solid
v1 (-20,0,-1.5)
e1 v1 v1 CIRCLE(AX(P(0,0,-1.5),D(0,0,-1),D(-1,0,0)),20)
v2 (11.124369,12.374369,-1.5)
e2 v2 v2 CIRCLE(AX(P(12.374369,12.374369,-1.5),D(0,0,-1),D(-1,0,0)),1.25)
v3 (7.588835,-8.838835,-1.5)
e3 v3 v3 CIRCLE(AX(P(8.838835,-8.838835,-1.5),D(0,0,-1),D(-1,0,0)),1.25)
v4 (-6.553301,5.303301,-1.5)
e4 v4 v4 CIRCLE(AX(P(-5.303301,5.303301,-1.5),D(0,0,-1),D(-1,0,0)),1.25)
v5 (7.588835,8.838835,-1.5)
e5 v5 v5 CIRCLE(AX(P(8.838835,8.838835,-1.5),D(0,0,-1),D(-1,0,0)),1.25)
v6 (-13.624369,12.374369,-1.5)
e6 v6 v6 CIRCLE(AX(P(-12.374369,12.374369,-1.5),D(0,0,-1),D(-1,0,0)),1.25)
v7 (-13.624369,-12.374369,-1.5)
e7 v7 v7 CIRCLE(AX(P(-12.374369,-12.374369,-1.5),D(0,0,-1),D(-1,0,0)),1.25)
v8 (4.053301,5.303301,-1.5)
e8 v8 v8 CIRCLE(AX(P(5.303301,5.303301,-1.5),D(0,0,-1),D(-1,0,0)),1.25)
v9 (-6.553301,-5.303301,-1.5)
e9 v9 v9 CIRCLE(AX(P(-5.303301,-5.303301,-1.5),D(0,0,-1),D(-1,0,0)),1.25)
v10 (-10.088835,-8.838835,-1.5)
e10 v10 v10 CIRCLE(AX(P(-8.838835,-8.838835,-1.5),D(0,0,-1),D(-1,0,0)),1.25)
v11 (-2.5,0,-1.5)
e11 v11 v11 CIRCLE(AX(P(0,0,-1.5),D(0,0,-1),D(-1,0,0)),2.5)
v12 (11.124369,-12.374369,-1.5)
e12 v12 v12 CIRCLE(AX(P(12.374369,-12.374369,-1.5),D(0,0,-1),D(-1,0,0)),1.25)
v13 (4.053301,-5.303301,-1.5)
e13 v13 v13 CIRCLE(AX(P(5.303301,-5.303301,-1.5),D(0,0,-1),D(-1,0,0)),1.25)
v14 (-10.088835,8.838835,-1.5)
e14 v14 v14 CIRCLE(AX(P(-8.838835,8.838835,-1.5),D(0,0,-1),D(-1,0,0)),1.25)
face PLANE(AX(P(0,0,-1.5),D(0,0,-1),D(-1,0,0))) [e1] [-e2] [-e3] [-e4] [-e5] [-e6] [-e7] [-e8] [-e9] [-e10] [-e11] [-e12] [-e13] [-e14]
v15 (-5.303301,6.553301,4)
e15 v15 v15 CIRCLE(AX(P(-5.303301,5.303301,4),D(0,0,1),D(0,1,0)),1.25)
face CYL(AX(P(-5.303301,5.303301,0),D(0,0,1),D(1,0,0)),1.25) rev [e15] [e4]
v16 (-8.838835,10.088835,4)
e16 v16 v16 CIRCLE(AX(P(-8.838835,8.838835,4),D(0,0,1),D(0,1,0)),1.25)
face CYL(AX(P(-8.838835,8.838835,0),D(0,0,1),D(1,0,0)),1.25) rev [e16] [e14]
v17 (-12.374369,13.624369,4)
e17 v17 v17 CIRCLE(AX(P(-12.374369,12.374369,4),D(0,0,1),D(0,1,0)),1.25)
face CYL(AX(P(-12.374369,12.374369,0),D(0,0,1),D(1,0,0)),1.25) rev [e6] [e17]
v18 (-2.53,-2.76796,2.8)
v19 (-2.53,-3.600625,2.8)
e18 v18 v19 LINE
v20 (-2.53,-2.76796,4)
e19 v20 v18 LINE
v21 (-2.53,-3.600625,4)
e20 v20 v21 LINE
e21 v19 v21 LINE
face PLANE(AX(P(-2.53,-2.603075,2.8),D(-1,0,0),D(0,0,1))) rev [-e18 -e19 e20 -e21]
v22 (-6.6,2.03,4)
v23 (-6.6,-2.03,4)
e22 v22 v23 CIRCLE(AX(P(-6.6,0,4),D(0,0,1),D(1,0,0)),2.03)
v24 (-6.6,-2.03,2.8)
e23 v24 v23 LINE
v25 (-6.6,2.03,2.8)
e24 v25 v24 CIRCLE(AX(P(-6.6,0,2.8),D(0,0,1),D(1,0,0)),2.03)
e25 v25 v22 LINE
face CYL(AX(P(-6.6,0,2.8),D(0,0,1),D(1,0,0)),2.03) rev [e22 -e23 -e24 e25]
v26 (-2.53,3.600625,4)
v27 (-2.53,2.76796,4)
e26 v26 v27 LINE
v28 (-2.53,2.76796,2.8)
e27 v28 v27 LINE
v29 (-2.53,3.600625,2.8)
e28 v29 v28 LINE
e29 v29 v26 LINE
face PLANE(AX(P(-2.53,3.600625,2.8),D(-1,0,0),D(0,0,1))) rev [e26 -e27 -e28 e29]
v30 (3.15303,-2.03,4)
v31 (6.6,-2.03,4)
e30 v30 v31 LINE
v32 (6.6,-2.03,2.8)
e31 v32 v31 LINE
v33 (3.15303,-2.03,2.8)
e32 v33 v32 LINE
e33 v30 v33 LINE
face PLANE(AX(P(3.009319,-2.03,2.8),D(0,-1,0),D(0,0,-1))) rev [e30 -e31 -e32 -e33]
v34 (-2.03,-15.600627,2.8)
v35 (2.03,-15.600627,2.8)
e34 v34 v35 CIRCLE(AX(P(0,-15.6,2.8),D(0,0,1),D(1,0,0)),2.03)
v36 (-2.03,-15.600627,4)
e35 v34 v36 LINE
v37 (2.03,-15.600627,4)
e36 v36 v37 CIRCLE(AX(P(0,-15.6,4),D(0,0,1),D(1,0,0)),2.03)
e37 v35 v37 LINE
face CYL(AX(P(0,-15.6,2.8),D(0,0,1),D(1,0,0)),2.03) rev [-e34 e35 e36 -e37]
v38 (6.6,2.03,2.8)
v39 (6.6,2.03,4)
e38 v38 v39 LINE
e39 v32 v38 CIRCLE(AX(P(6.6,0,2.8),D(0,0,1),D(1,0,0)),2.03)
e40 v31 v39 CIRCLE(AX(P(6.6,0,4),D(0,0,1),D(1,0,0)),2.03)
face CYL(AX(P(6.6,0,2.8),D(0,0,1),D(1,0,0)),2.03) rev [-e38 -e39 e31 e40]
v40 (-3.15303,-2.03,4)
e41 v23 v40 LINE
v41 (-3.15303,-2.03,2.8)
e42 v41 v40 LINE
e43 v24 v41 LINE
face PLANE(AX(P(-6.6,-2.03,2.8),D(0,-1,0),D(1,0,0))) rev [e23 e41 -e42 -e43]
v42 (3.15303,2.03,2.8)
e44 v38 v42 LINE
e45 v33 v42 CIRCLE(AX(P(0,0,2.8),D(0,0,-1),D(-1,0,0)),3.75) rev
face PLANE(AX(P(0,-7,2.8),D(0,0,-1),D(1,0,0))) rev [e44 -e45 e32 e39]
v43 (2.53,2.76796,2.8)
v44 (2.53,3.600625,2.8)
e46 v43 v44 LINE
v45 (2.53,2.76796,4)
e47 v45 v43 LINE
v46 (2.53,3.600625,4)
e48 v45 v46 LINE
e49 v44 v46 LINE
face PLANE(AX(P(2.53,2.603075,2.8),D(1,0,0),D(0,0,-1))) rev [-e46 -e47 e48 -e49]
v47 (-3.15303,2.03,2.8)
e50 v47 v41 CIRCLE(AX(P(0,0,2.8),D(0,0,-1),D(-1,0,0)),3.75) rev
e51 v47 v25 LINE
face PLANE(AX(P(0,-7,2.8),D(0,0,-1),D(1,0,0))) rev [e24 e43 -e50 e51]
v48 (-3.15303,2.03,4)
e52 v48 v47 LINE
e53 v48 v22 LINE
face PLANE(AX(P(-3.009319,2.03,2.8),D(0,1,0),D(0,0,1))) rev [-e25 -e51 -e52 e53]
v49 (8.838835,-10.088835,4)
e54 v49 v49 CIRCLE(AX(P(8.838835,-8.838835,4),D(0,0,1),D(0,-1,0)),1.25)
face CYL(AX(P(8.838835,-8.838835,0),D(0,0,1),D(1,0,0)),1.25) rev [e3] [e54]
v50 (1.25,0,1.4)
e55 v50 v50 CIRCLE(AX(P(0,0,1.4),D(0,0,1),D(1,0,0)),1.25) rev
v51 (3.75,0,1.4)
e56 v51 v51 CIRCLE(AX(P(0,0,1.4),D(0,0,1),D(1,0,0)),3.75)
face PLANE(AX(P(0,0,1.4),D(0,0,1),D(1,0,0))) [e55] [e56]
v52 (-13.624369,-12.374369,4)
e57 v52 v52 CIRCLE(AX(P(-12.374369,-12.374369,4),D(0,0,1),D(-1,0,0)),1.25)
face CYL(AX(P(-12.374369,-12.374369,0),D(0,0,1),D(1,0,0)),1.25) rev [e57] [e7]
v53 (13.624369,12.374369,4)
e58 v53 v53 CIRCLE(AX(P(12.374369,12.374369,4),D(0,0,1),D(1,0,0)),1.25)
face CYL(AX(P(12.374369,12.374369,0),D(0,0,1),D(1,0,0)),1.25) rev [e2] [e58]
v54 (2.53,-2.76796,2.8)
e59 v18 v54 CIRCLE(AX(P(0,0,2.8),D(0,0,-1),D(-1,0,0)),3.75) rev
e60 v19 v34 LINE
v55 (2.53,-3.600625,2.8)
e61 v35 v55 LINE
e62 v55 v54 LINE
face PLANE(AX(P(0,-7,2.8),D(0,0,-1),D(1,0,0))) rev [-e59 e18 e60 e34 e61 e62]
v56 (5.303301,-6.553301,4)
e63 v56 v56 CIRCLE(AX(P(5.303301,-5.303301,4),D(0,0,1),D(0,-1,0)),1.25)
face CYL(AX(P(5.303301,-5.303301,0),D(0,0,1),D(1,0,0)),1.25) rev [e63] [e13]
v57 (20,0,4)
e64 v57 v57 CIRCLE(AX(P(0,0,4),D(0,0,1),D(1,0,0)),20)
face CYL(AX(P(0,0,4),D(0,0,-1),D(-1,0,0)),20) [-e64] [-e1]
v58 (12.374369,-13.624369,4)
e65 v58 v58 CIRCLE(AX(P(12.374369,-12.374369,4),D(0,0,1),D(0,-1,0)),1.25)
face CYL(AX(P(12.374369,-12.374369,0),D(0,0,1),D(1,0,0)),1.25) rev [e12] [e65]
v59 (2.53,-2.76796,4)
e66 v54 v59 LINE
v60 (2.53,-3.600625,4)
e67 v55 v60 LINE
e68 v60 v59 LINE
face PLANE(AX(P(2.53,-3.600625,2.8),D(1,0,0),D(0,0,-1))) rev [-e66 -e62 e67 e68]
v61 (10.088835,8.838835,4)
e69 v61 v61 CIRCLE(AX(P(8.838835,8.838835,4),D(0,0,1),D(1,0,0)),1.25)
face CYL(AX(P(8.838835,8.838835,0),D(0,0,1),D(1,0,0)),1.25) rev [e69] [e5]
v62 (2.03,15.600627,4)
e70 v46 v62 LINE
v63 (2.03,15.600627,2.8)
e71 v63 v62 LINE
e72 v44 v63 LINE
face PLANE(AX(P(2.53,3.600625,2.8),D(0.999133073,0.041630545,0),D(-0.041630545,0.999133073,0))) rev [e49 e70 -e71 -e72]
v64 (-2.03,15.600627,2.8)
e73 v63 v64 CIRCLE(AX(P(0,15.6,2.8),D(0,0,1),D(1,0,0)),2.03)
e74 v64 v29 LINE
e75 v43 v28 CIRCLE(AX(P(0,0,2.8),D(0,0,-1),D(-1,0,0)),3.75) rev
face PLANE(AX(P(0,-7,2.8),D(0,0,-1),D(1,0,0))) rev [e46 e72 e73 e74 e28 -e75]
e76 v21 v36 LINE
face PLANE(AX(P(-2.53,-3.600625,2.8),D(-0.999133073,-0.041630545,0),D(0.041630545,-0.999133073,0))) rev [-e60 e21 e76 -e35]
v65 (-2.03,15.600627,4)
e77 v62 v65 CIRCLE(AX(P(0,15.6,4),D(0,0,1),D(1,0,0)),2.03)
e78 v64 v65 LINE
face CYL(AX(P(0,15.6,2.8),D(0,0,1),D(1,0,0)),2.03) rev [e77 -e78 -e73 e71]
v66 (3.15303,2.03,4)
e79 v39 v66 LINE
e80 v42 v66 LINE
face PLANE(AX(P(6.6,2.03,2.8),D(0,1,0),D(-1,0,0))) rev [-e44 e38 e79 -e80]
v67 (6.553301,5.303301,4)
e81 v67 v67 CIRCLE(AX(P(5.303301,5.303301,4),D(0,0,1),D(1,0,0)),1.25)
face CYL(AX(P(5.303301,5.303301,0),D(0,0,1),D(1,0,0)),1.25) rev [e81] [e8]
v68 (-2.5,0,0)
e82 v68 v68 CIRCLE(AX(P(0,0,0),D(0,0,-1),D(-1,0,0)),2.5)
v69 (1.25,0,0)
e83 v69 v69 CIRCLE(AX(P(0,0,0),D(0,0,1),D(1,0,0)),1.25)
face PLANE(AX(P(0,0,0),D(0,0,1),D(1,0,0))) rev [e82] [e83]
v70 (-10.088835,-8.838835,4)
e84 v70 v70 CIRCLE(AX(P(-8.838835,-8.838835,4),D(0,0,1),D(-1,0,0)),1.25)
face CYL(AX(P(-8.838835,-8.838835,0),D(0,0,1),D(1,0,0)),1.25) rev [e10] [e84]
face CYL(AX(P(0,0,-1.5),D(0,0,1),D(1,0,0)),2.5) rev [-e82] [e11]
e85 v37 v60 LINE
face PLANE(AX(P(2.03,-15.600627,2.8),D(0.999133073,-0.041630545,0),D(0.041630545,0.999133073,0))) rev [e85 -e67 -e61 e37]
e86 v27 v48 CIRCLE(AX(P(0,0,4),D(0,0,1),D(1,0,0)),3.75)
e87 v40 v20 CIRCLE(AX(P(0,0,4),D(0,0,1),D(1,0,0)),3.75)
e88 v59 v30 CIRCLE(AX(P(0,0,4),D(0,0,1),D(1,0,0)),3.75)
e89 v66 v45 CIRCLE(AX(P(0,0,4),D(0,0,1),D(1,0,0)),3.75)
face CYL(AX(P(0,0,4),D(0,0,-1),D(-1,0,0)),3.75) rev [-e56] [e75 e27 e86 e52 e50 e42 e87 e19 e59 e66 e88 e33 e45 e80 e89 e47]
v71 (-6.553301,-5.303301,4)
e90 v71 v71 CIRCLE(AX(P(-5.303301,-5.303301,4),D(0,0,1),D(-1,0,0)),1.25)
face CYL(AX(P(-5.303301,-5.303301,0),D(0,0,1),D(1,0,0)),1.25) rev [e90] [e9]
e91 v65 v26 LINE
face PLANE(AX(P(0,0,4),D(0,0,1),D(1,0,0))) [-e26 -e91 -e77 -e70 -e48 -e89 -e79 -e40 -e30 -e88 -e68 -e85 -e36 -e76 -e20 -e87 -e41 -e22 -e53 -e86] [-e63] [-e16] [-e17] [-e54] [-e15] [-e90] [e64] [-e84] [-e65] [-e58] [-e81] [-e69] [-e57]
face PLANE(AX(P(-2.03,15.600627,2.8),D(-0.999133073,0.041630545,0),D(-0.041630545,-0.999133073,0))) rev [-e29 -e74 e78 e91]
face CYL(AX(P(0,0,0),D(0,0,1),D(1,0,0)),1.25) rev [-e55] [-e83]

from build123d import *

# Parameters (mm, degrees)
SKETCH1_R               = 20
BOSS_EXTRUDE1_DEPTH     = 4
SKETCH2_R               = 1.25
CUT_EXTRUDE1_DEPTH      = 29.565713714
CAVITY1_START           = 2.8
CAVITY1_OUTLINE_R       = 0.675
CAVITY1_OUTLINE_R_2     = 0.6
CAVITY1_OUTLINE_R_3     = 2.5
CAVITY1_DEPTH           = 1.2
CAVITY1_START_2         = 3.4
CAVITY1_2_OUTLINE_R     = 2.5
CAVITY1_2_OUTLINE_R_2   = 1.25
CAVITY1_2_DEPTH         = 0.6
CUT_EXTRUDE2_START      = -2
CUT_EXTRUDE2_DEPTH      = 2
CUT_EXTRUDE3_START      = -1.2
CUT_EXTRUDE3_DEPTH      = 1.2
CUT_EXTRUDE4_DEPTH      = 1.2
SKETCH6_R               = 1.25
CUT_EXTRUDE5_DEPTH      = 29.565713714
CIRPATTERN1_COUNT       = 4
CUT_EXTRUDE6_DEPTH      = 29.422526278
CUT_EXTRUDE6_DEPTH_BACK = 1.4
SKETCH7_R               = 3.75
SKETCH8_R               = 20
SKETCH8_R_2             = 2.5
SKETCH8_R_3             = 1.25
BOSS_EXTRUDE2_DEPTH     = 1.5


# Read off the part's stored shape, not the designer's step: Cavity1
with BuildPart() as part:
    # Sketch1 → Boss-Extrude1 (new body)
    with BuildSketch(Plane.XY):
        Circle(SKETCH1_R)
    extrude(amount=BOSS_EXTRUDE1_DEPTH)

    # Sketch2 → Cut-Extrude1 (cut, through all)
    with BuildSketch(Plane.XY.offset(4)):
        Circle(SKETCH2_R)
    extrude(amount=-CUT_EXTRUDE1_DEPTH, mode=Mode.SUBTRACT)

    # Cavity1 outline → Cavity1 (cut)
    with BuildSketch(Plane.XY.offset(CAVITY1_START)):
        with BuildLine():
            ThreePointArc((2.993325909, 2), (2.762479071, 2.308399745), (2.5, 2.590366769))
            Line((2.5, 2.590366769), (2.5, 3.6))
            Line((2.5, 3.6), (2, 15.6))
            ThreePointArc((2, 15.6), (0, 17.6), (-2, 15.6))
            Line((-2, 15.6), (-2.5, 3.6))
            Line((-2.5, 3.6), (-2.5, 2.590366769))
            ThreePointArc((-2.5, 2.590366769), (-2.762479071, 2.308399745), (-2.993325909, 2))
            Line((-2.993325909, 2), (-6.6, 2))
            ThreePointArc((-6.6, 2), (-8.6, 0), (-6.6, -2))
            Line((-6.6, -2), (-2.993325909, -2))
            ThreePointArc((-2.993325909, -2), (-2.762479071, -2.308399745), (-2.5, -2.590366769))
            Line((-2.5, -2.590366769), (-2.5, -3.6))
            Line((-2.5, -3.6), (-2, -15.6))
            ThreePointArc((-2, -15.6), (0, -17.6), (2, -15.6))
            Line((2, -15.6), (2.5, -3.6))
            Line((2.5, -3.6), (2.5, -2.590366769))
            ThreePointArc((2.5, -2.590366769), (2.762479071, -2.308399745), (2.993325909, -2))
            Line((2.993325909, -2), (6.6, -2))
            ThreePointArc((6.6, -2), (8.6, 0), (6.6, 2))
            Line((6.6, 2), (2.993325909, 2))
        make_face()
        with Locations((0, -15.6)):
            Circle(CAVITY1_OUTLINE_R, mode=Mode.SUBTRACT)
        with Locations((0, -13.4)):
            Circle(CAVITY1_OUTLINE_R, mode=Mode.SUBTRACT)
        with Locations((0, -11.2)):
            Circle(CAVITY1_OUTLINE_R, mode=Mode.SUBTRACT)
        with Locations((0, -9)):
            Circle(CAVITY1_OUTLINE_R, mode=Mode.SUBTRACT)
        with Locations((0, -6.8)):
            Circle(CAVITY1_OUTLINE_R, mode=Mode.SUBTRACT)
        with Locations((0, -4.6)):
            Circle(CAVITY1_OUTLINE_R, mode=Mode.SUBTRACT)
        with Locations((-6.6, 0)):
            Circle(CAVITY1_OUTLINE_R_2, mode=Mode.SUBTRACT)
        with Locations((-4.6, 0)):
            Circle(CAVITY1_OUTLINE_R_2, mode=Mode.SUBTRACT)
        Circle(CAVITY1_OUTLINE_R_3, mode=Mode.SUBTRACT)
        with Locations((0, 4.6)):
            Circle(CAVITY1_OUTLINE_R, mode=Mode.SUBTRACT)
        with Locations((0, 6.8)):
            Circle(CAVITY1_OUTLINE_R, mode=Mode.SUBTRACT)
        with Locations((4.6, 0)):
            Circle(CAVITY1_OUTLINE_R_2, mode=Mode.SUBTRACT)
        with Locations((6.6, 0)):
            Circle(CAVITY1_OUTLINE_R_2, mode=Mode.SUBTRACT)
        with Locations((0, 9)):
            Circle(CAVITY1_OUTLINE_R, mode=Mode.SUBTRACT)
        with Locations((0, 11.2)):
            Circle(CAVITY1_OUTLINE_R, mode=Mode.SUBTRACT)
        with Locations((0, 13.4)):
            Circle(CAVITY1_OUTLINE_R, mode=Mode.SUBTRACT)
        with Locations((0, 15.6)):
            Circle(CAVITY1_OUTLINE_R, mode=Mode.SUBTRACT)
    extrude(amount=CAVITY1_DEPTH, mode=Mode.SUBTRACT)

    # Cavity1 2 outline → Cavity1 2 (cut)
    with BuildSketch(Plane.XY.offset(CAVITY1_START_2)):
        Circle(CAVITY1_2_OUTLINE_R)
        Circle(CAVITY1_2_OUTLINE_R_2, mode=Mode.SUBTRACT)
    extrude(amount=CAVITY1_2_DEPTH, mode=Mode.SUBTRACT)

    # Sketch3 → Cut-Extrude2 (cut)
    with BuildSketch(Plane.XY.offset(3.4).offset(CUT_EXTRUDE2_START)):
        with BuildLine():
            ThreePointArc((-2.5, 0), (0, -2.5), (2.5, 0))
            ThreePointArc((2.5, 0), (0, 2.5), (-2.5, 0))
        make_face()
    extrude(amount=CUT_EXTRUDE2_DEPTH, mode=Mode.SUBTRACT)

    # Sketch4 → Cut-Extrude3 (cut)
    with BuildSketch(Plane.XY.offset(4).offset(CUT_EXTRUDE3_START)):
        with BuildLine():
            Line((-6.6, -2), (-2.993325909, -2))
            ThreePointArc((-2.993325909, -2), (-2.762479071, -2.308399745), (-2.5, -2.590366769))
            Line((-2.5, -2.590366769), (-2.5, -3.6))
            Line((-2.5, -3.6), (-2, -15.6))
            ThreePointArc((-2, -15.6), (0, -17.6), (2, -15.6))
            Line((2, -15.6), (2.5, -3.6))
            Line((2.5, -3.6), (2.5, -2.590366769))
            ThreePointArc((2.5, -2.590366769), (2.762479071, -2.308399745), (2.993325909, -2))
            Line((2.993325909, -2), (6.6, -2))
            ThreePointArc((6.6, -2), (8.6, 0), (6.6, 2))
            Line((6.6, 2), (2.993325909, 2))
            ThreePointArc((2.993325909, 2), (2.762479071, 2.308399745), (2.5, 2.590366769))
            Line((2.5, 2.590366769), (2.5, 3.6))
            Line((2.5, 3.6), (2, 15.6))
            ThreePointArc((2, 15.6), (0, 17.6), (-2, 15.6))
            Line((-2, 15.6), (-2.5, 3.6))
            Line((-2.5, 3.6), (-2.5, 2.590366769))
            ThreePointArc((-2.5, 2.590366769), (-2.762479071, 2.308399745), (-2.993325909, 2))
            Line((-2.993325909, 2), (-6.6, 2))
            ThreePointArc((-6.6, 2), (-8.6, 0), (-6.6, -2))
        make_face()
    extrude(amount=CUT_EXTRUDE3_DEPTH, mode=Mode.SUBTRACT)

    # Sketch5 → Cut-Extrude4 (cut)
    with BuildSketch(Plane.XY.offset(4)):
        with BuildLine():
            Line((-6.6, -2.03), (-3.00931886, -2.03))
            ThreePointArc((-3.00931886, -2.03), (-2.784441978, -2.328901645), (-2.53, -2.603075105))
            Line((-2.53, -2.603075105), (-2.53, -3.600624729))
            Line((-2.53, -3.600624729), (-2.029999903, -15.600627053))
            ThreePointArc((-2.029999903, -15.600627053), (0, -17.63), (2.029999903, -15.600627053))
            Line((2.029999903, -15.600627053), (2.53, -3.600624729))
            Line((2.53, -3.600624729), (2.53, -2.603075105))
            ThreePointArc((2.53, -2.603075105), (2.784441978, -2.328901645), (3.00931886, -2.03))
            Line((3.00931886, -2.03), (6.6, -2.03))
            ThreePointArc((6.6, -2.03), (8.63, 0), (6.6, 2.03))
            Line((6.6, 2.03), (3.00931886, 2.03))
            ThreePointArc((3.00931886, 2.03), (2.784441978, 2.328901645), (2.53, 2.603075105))
            Line((2.53, 2.603075105), (2.53, 3.600624729))
            Line((2.53, 3.600624729), (2.029999903, 15.600627053))
            ThreePointArc((2.029999903, 15.600627053), (0, 17.63), (-2.029999903, 15.600627053))
            Line((-2.029999903, 15.600627053), (-2.53, 3.600624729))
            Line((-2.53, 3.600624729), (-2.53, 2.603075105))
            ThreePointArc((-2.53, 2.603075105), (-2.784441978, 2.328901645), (-3.00931886, 2.03))
            Line((-3.00931886, 2.03), (-6.6, 2.03))
            ThreePointArc((-6.6, 2.03), (-8.63, 0), (-6.6, -2.03))
        make_face()
    extrude(amount=-CUT_EXTRUDE4_DEPTH, mode=Mode.SUBTRACT)

    # Sketch6 → Cut-Extrude5 (cut, through all)
    with BuildSketch(Plane.XY.offset(4)):
        with Locations((5.303300859, 5.303300859)):
            Circle(SKETCH6_R)
        with Locations((8.838834765, 8.838834765)):
            Circle(SKETCH6_R)
        with Locations((12.374368671, 12.374368671)):
            Circle(SKETCH6_R)
    cut_extrude5 = extrude(amount=-CUT_EXTRUDE5_DEPTH, mode=Mode.SUBTRACT)

    # CirPattern1: Cut-Extrude5 ×4 about axis
    cirpattern1_axis = Axis((0, 0, 0), (0, 0, 1))
    for i in range(1, CIRPATTERN1_COUNT):
        add(cut_extrude5.rotate(cirpattern1_axis, i * 360 / CIRPATTERN1_COUNT), mode=Mode.SUBTRACT)

    # Sketch7 → Cut-Extrude6 (cut, two sides: drawn at the far end of the back side and taken through both)
    with BuildSketch(Plane.XY.offset(2.8).offset(-CUT_EXTRUDE6_DEPTH_BACK)):
        with Locations(Location((0, 0, 0), (0, 0, 147.225549173))):
            Circle(SKETCH7_R)
    extrude(amount=CUT_EXTRUDE6_DEPTH + CUT_EXTRUDE6_DEPTH_BACK, mode=Mode.SUBTRACT)

    # Sketch8 → Boss-Extrude2 (add)
    with BuildSketch(Plane(origin=(0, 0, 0), x_dir=(-1, 0, 0), z_dir=(0, 0, -1))):
        Circle(SKETCH8_R)
        Circle(SKETCH8_R_2, mode=Mode.SUBTRACT)
        with Locations(Location((12.374368671, 12.374368671, 0), (0, 0, 90))):
            Circle(SKETCH8_R_3, mode=Mode.SUBTRACT)
        with Locations(Location((-12.374368671, 12.374368671, 0), (0, 0, 180))):
            Circle(SKETCH8_R_3, mode=Mode.SUBTRACT)
        with Locations(Location((-8.838834765, 8.838834765, 0), (0, 0, 180))):
            Circle(SKETCH8_R_3, mode=Mode.SUBTRACT)
        with Locations(Location((-5.303300859, 5.303300859, 0), (0, 0, 180))):
            Circle(SKETCH8_R_3, mode=Mode.SUBTRACT)
        with Locations((12.374368671, -12.374368671)):
            Circle(SKETCH8_R_3, mode=Mode.SUBTRACT)
        with Locations((8.838834765, -8.838834765)):
            Circle(SKETCH8_R_3, mode=Mode.SUBTRACT)
        with Locations((5.303300859, -5.303300859)):
            Circle(SKETCH8_R_3, mode=Mode.SUBTRACT)
        with Locations(Location((-12.374368671, -12.374368671, 0), (0, 0, 270))):
            Circle(SKETCH8_R_3, mode=Mode.SUBTRACT)
        with Locations(Location((-8.838834765, -8.838834765, 0), (0, 0, 270))):
            Circle(SKETCH8_R_3, mode=Mode.SUBTRACT)
        with Locations(Location((-5.303300859, -5.303300859, 0), (0, 0, 270))):
            Circle(SKETCH8_R_3, mode=Mode.SUBTRACT)
        with Locations(Location((5.303300859, 5.303300859, 0), (0, 0, 90))):
            Circle(SKETCH8_R_3, mode=Mode.SUBTRACT)
        with Locations(Location((8.838834765, 8.838834765, 0), (0, 0, 90))):
            Circle(SKETCH8_R_3, mode=Mode.SUBTRACT)
    extrude(amount=BOSS_EXTRUDE2_DEPTH)


solid = part.part
